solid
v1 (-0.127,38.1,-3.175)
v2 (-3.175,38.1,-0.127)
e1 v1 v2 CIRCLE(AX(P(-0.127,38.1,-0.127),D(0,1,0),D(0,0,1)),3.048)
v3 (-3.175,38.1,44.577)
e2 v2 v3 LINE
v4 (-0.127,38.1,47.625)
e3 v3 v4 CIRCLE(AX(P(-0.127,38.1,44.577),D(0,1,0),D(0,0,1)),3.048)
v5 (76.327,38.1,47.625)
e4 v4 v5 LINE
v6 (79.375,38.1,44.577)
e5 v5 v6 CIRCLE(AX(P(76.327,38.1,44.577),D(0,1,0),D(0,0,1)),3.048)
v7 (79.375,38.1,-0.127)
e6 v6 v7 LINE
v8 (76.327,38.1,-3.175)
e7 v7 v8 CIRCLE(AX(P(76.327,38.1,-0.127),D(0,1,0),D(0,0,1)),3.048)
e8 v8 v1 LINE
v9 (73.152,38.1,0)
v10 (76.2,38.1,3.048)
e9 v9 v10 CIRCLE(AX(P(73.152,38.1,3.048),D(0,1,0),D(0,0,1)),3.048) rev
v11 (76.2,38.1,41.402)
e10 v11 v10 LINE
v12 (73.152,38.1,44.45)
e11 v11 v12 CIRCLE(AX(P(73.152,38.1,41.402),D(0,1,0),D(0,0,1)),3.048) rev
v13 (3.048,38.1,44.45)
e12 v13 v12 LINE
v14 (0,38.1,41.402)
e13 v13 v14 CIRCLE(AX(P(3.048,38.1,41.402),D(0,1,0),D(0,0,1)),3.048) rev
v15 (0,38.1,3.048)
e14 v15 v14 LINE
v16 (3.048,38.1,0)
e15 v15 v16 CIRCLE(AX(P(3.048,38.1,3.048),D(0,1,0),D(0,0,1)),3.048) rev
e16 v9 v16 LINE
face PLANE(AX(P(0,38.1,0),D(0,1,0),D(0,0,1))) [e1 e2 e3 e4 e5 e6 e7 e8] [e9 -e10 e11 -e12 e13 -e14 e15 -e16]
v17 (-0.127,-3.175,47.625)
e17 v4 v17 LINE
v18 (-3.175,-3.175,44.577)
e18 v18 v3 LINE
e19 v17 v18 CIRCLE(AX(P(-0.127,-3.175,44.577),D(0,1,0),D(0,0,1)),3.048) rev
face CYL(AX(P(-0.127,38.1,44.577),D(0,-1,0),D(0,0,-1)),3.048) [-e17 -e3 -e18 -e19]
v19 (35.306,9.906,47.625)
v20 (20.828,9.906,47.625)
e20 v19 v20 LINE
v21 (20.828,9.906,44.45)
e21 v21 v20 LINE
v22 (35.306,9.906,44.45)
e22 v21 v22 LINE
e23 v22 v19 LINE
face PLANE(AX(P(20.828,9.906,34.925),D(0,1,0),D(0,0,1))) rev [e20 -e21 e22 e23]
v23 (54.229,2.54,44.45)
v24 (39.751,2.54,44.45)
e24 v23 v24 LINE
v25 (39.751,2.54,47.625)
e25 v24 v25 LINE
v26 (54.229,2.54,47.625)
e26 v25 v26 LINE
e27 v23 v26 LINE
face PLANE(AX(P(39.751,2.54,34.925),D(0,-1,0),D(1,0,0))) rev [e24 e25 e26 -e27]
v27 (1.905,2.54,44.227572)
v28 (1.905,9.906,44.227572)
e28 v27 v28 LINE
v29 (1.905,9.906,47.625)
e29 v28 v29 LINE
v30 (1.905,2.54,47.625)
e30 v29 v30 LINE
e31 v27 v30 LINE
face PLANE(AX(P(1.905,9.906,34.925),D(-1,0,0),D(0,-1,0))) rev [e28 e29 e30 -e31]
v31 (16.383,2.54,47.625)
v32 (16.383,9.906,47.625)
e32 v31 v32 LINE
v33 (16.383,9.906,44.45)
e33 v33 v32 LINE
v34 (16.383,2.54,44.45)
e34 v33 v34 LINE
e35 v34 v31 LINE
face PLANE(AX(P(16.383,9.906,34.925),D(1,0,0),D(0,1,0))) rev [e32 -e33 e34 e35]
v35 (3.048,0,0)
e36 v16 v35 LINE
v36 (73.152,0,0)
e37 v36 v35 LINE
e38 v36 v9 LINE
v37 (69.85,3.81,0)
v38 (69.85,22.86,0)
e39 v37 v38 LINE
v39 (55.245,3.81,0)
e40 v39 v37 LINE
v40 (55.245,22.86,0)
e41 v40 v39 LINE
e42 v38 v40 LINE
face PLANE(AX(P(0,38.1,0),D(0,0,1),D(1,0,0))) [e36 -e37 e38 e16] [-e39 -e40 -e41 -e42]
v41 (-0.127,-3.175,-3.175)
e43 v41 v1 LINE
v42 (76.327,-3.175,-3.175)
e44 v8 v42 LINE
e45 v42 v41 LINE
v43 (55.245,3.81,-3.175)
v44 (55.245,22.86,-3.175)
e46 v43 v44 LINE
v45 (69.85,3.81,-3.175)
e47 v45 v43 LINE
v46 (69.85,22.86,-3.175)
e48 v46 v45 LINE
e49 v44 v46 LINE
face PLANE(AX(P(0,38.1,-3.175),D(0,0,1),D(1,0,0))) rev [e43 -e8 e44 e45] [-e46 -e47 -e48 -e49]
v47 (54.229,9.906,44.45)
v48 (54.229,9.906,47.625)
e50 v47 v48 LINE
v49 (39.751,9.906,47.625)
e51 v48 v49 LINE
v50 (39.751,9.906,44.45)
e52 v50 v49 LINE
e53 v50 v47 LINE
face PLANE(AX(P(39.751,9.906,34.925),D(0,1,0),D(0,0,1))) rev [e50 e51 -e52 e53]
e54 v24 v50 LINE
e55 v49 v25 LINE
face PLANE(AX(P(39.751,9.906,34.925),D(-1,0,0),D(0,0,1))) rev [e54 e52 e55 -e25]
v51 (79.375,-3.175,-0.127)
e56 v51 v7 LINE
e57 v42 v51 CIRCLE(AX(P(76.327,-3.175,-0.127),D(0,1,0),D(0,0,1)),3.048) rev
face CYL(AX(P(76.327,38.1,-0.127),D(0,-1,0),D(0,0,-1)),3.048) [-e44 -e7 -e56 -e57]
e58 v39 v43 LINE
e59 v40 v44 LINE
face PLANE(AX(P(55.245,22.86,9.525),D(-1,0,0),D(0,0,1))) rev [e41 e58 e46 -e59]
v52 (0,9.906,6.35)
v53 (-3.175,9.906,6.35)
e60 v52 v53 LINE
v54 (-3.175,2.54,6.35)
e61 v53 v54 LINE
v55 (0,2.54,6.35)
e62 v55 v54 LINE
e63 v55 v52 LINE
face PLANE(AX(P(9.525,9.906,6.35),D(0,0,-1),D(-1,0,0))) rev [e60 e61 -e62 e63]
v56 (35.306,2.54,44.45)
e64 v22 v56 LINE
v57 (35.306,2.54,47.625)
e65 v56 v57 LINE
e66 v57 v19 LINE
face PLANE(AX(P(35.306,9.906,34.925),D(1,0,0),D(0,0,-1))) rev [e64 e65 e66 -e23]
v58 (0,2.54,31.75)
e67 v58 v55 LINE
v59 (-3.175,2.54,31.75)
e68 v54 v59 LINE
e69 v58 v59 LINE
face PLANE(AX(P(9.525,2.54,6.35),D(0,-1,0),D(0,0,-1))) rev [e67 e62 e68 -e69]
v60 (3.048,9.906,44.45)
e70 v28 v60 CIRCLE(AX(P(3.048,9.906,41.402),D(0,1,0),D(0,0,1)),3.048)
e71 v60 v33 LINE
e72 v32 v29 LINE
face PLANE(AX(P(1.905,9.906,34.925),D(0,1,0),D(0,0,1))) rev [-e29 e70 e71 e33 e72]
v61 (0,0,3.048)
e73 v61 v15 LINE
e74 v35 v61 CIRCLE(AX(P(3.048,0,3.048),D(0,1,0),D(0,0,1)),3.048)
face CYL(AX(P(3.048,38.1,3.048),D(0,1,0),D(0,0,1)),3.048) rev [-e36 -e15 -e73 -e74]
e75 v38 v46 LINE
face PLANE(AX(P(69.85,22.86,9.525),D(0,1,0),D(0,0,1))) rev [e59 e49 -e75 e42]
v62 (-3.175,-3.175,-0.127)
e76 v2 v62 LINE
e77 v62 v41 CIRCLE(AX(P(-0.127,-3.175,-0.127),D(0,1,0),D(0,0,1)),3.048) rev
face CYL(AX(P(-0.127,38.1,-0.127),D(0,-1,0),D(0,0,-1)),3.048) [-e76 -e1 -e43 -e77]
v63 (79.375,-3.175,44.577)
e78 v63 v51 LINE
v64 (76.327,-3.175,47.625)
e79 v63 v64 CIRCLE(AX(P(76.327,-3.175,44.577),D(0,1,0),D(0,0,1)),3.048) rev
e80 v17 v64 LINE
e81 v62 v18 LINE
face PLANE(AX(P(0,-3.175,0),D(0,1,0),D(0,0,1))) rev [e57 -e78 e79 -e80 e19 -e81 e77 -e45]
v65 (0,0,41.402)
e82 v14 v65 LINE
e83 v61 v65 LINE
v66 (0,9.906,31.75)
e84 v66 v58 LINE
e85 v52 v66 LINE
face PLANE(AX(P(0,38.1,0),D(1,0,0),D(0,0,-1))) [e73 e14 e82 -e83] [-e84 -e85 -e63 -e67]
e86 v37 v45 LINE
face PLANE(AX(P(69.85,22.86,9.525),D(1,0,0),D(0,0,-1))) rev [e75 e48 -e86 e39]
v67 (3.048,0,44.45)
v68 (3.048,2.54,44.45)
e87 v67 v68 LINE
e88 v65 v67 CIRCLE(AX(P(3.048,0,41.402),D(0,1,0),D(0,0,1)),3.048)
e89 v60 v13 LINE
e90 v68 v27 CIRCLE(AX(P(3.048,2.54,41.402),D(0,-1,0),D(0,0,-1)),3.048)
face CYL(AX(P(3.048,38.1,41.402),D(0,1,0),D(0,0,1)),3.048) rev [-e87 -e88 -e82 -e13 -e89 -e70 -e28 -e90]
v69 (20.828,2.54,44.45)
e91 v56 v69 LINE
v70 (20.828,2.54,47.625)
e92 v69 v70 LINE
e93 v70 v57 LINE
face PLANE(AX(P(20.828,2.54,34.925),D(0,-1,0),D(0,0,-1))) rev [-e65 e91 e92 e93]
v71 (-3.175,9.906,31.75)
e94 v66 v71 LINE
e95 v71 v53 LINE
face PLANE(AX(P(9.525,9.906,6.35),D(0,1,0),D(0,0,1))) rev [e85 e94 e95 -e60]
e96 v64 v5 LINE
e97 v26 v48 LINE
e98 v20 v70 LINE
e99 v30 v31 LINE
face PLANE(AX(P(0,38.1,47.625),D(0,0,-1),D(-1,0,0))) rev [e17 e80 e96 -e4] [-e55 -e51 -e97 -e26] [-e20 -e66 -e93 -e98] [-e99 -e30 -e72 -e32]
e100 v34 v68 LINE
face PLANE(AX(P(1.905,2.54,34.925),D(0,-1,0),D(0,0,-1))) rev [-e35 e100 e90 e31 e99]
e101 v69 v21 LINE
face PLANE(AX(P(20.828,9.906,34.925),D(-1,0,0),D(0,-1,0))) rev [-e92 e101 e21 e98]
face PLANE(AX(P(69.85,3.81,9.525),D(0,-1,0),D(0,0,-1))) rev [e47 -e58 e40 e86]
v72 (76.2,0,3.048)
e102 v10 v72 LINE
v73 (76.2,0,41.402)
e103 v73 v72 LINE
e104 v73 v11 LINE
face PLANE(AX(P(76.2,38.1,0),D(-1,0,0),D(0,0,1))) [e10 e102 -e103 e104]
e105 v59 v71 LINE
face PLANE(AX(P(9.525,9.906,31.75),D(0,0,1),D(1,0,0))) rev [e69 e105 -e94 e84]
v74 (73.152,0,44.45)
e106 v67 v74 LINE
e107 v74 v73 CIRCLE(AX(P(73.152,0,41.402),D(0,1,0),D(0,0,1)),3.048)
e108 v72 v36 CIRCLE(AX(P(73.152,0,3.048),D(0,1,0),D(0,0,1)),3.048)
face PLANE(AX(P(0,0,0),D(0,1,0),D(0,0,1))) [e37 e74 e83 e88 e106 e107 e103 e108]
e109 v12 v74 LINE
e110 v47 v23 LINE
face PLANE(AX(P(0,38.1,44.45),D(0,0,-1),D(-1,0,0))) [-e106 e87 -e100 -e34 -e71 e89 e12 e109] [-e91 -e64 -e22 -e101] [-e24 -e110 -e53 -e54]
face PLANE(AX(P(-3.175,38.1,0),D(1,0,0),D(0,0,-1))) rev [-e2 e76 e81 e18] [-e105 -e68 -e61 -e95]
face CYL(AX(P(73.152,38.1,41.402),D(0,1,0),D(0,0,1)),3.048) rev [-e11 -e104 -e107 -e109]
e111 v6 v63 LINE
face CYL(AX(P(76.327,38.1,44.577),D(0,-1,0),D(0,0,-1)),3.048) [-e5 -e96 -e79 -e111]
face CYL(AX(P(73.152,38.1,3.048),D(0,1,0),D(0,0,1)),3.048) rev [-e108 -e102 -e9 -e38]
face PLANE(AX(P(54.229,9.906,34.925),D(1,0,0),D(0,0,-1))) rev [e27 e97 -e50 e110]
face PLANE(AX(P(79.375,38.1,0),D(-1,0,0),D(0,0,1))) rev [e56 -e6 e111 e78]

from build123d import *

# Parameters (mm, degrees)
SKETCH1_W           = 76.2
SKETCH1_H           = 44.45
BOSS_EXTRUDE1_DEPTH = 38.1
SHELL1_T            = 3.175
SKETCH2_W           = 14.478
SKETCH2_H           = 7.366
CUT_EXTRUDE1_DEPTH  = 12.7
SKETCH3_W           = 25.4
SKETCH3_H           = 7.366
CUT_EXTRUDE2_DEPTH  = 12.7
SKETCH4_W           = 14.605
SKETCH4_H           = 19.05
CUT_EXTRUDE3_DEPTH  = 12.7
FILLET1_R           = 3.048


with BuildPart() as part:
    # Sketch1 → Boss-Extrude1 (new body)
    with BuildSketch(Plane(origin=(0, 0, 0), x_dir=(1, 0, 0), z_dir=(0, 1, 0))):
        with Locations((38.1, -22.225)):
            Rectangle(SKETCH1_W, SKETCH1_H)
    extrude(amount=BOSS_EXTRUDE1_DEPTH)

    # Shell1
    shell1_openings = [part.faces().sort_by_distance(p)[0] for p in [
        (38.1, 38.1, 22.225),
    ]]
    offset(amount=SHELL1_T, openings=shell1_openings, kind=Kind.INTERSECTION)

    # Sketch2 → Cut-Extrude1 (cut)
    with BuildSketch(Plane.XY.offset(47.625)):
        with Locations((46.99, 6.223)):
            Rectangle(SKETCH2_W, SKETCH2_H)
        with Locations((9.144, 6.223)):
            Rectangle(SKETCH2_W, SKETCH2_H)
        with Locations((28.067, 6.223)):
            Rectangle(SKETCH2_W, SKETCH2_H)
    extrude(amount=-CUT_EXTRUDE1_DEPTH, mode=Mode.SUBTRACT)

    # Sketch3 → Cut-Extrude2 (cut)
    with BuildSketch(Plane.ZY.offset(3.175)):
        with Locations((19.05, 6.223)):
            Rectangle(SKETCH3_W, SKETCH3_H)
    extrude(amount=-CUT_EXTRUDE2_DEPTH, mode=Mode.SUBTRACT)

    # Sketch4 → Cut-Extrude3 (cut)
    with BuildSketch(Plane(origin=(0, 0, -3.175), x_dir=(-1, 0, 0), z_dir=(0, 0, -1))):
        with Locations((-62.5475, 13.335)):
            Rectangle(SKETCH4_W, SKETCH4_H)
    extrude(amount=-CUT_EXTRUDE3_DEPTH, mode=Mode.SUBTRACT)

    # Fillet1
    # the kernel refuses this fillet: 3.048 mm, written as the material it adds along each edge
    with BuildSketch(Plane(origin=(0, 0, 0), x_dir=(1, 0, 0), z_dir=(0, 1, 0))) as fillet1_piece_1:
        with BuildLine():
            CenterArc((FILLET1_R, -FILLET1_R), FILLET1_R, 90, 90)
            Line((0, -FILLET1_R), (0, 0))
            Line((0, 0), (FILLET1_R, 0))
        make_face()
    extrude(amount=38.1)
    with BuildSketch(Plane(origin=(0, 0, 44.45), x_dir=(0, 0, -1), z_dir=(0, 1, 0))) as fillet1_piece_2_section:
        with BuildLine():
            CenterArc((FILLET1_R, -FILLET1_R), FILLET1_R, 90, 90)
            Line((0, -FILLET1_R), (0, 0))
            Line((0, 0), (FILLET1_R, 0))
        make_face()
    fillet1_piece_2 = extrude(amount=38.1, mode=Mode.PRIVATE)
    fillet1_piece_2 = split(fillet1_piece_2, bisect_by=Plane(origin=(1.905, 1.27, 43.71379522), z_dir=(-1, 0, 0)), keep=Keep.TOP, mode=Mode.PRIVATE)
    fillet1_piece_2 = split(fillet1_piece_2, bisect_by=Plane(origin=(0.57743071, 2.54, 43.71379522), z_dir=(0, -1, 0)), keep=Keep.TOP, mode=Mode.PRIVATE)
    add(fillet1_piece_2)
    with BuildSketch(Plane(origin=(0, 0, 44.45), x_dir=(0, 0, -1), z_dir=(0, 1, 0))) as fillet1_piece_3_section:
        with BuildLine():
            CenterArc((FILLET1_R, -FILLET1_R), FILLET1_R, 90, 90)
            Line((0, -FILLET1_R), (0, 0))
            Line((0, 0), (FILLET1_R, 0))
        make_face()
    fillet1_piece_3 = extrude(amount=38.1, mode=Mode.PRIVATE)
    fillet1_piece_3 = split(fillet1_piece_3, bisect_by=Plane(origin=(1.905, 1.27, 44.427738201), z_dir=(1, 0, 0)), keep=Keep.TOP, mode=Mode.PRIVATE)
    fillet1_piece_3 = split(fillet1_piece_3, bisect_by=Plane(origin=(2.319599586, 2.54, 44.427738201), z_dir=(0, -1, 0)), keep=Keep.TOP, mode=Mode.PRIVATE)
    add(fillet1_piece_3)
    with BuildSketch(Plane(origin=(0, 0, 44.45), x_dir=(0, 0, -1), z_dir=(0, 1, 0))) as fillet1_piece_4_section:
        with BuildLine():
            CenterArc((FILLET1_R, -FILLET1_R), FILLET1_R, 90, 90)
            Line((0, -FILLET1_R), (0, 0))
            Line((0, 0), (FILLET1_R, 0))
        make_face()
    fillet1_piece_4 = extrude(amount=38.1, mode=Mode.PRIVATE)
    fillet1_piece_4 = split(fillet1_piece_4, bisect_by=Plane(origin=(1.905, 6.223, 43.71379522), z_dir=(-1, 0, 0)), keep=Keep.TOP, mode=Mode.PRIVATE)
    fillet1_piece_4 = split(fillet1_piece_4, bisect_by=Plane(origin=(0.57743071, 2.54, 43.71379522), z_dir=(0, 1, 0)), keep=Keep.TOP, mode=Mode.PRIVATE)
    fillet1_piece_4 = split(fillet1_piece_4, bisect_by=Plane(origin=(0.57743071, 9.906, 43.71379522), z_dir=(0, -1, 0)), keep=Keep.TOP, mode=Mode.PRIVATE)
    add(fillet1_piece_4)
    with BuildSketch(Plane(origin=(0, 0, 44.45), x_dir=(0, 0, -1), z_dir=(0, 1, 0))) as fillet1_piece_5_section:
        with BuildLine():
            CenterArc((FILLET1_R, -FILLET1_R), FILLET1_R, 90, 90)
            Line((0, -FILLET1_R), (0, 0))
            Line((0, 0), (FILLET1_R, 0))
        make_face()
    fillet1_piece_5 = extrude(amount=38.1, mode=Mode.PRIVATE)
    fillet1_piece_5 = split(fillet1_piece_5, bisect_by=Plane(origin=(1.905, 24.003, 43.71379522), z_dir=(-1, 0, 0)), keep=Keep.TOP, mode=Mode.PRIVATE)
    fillet1_piece_5 = split(fillet1_piece_5, bisect_by=Plane(origin=(0.57743071, 9.906, 43.71379522), z_dir=(0, 1, 0)), keep=Keep.TOP, mode=Mode.PRIVATE)
    add(fillet1_piece_5)
    with BuildSketch(Plane(origin=(0, 0, 44.45), x_dir=(0, 0, -1), z_dir=(0, 1, 0))) as fillet1_piece_6_section:
        with BuildLine():
            CenterArc((FILLET1_R, -FILLET1_R), FILLET1_R, 90, 90)
            Line((0, -FILLET1_R), (0, 0))
            Line((0, 0), (FILLET1_R, 0))
        make_face()
    fillet1_piece_6 = extrude(amount=38.1, mode=Mode.PRIVATE)
    fillet1_piece_6 = split(fillet1_piece_6, bisect_by=Plane(origin=(1.905, 24.003, 44.427738201), z_dir=(1, 0, 0)), keep=Keep.TOP, mode=Mode.PRIVATE)
    fillet1_piece_6 = split(fillet1_piece_6, bisect_by=Plane(origin=(2.319599586, 9.906, 44.427738201), z_dir=(0, 1, 0)), keep=Keep.TOP, mode=Mode.PRIVATE)
    add(fillet1_piece_6)
    with BuildSketch(Plane(origin=(76.2, 0, 44.45), x_dir=(0, 0, -1), z_dir=(0, 1, 0)), Plane(origin=(76.2, 0, 0), x_dir=(-1, 0, 0), z_dir=(0, 1, 0))) as fillet1_piece_7:
        with BuildLine():
            CenterArc((FILLET1_R, FILLET1_R), FILLET1_R, 180, 90)
            Line((0, FILLET1_R), (0, 0))
            Line((0, 0), (FILLET1_R, 0))
        make_face()
    extrude(amount=38.1)
    # the kernel refuses this fillet: 3.048 mm, written as the material it takes off along each edge
    with BuildSketch(Plane(origin=(-3.175, -10.795, -3.175), x_dir=(1, 0, 0), z_dir=(0, 1, 0)), Plane(origin=(79.375, 45.72, -3.175), x_dir=(-1, 0, 0), z_dir=(0, -1, 0))) as fillet1_2_piece_1:
        with BuildLine():
            CenterArc((FILLET1_R, -FILLET1_R), FILLET1_R, 90, 90)
            Line((0, -FILLET1_R), (0, 0))
            Line((0, 0), (FILLET1_R, 0))
        make_face()
    extrude(amount=56.515, mode=Mode.SUBTRACT)
    with BuildSketch(Plane(origin=(-3.175, 45.72, 47.625), x_dir=(0, 0, -1), z_dir=(0, -1, 0)), Plane(origin=(79.375, 45.72, 47.625), x_dir=(-1, 0, 0), z_dir=(0, -1, 0))) as fillet1_2_piece_2:
        with BuildLine():
            CenterArc((FILLET1_R, FILLET1_R), FILLET1_R, 180, 90)
            Line((0, FILLET1_R), (0, 0))
            Line((0, 0), (FILLET1_R, 0))
        make_face()
    extrude(amount=56.515, mode=Mode.SUBTRACT)


solid = part.part
